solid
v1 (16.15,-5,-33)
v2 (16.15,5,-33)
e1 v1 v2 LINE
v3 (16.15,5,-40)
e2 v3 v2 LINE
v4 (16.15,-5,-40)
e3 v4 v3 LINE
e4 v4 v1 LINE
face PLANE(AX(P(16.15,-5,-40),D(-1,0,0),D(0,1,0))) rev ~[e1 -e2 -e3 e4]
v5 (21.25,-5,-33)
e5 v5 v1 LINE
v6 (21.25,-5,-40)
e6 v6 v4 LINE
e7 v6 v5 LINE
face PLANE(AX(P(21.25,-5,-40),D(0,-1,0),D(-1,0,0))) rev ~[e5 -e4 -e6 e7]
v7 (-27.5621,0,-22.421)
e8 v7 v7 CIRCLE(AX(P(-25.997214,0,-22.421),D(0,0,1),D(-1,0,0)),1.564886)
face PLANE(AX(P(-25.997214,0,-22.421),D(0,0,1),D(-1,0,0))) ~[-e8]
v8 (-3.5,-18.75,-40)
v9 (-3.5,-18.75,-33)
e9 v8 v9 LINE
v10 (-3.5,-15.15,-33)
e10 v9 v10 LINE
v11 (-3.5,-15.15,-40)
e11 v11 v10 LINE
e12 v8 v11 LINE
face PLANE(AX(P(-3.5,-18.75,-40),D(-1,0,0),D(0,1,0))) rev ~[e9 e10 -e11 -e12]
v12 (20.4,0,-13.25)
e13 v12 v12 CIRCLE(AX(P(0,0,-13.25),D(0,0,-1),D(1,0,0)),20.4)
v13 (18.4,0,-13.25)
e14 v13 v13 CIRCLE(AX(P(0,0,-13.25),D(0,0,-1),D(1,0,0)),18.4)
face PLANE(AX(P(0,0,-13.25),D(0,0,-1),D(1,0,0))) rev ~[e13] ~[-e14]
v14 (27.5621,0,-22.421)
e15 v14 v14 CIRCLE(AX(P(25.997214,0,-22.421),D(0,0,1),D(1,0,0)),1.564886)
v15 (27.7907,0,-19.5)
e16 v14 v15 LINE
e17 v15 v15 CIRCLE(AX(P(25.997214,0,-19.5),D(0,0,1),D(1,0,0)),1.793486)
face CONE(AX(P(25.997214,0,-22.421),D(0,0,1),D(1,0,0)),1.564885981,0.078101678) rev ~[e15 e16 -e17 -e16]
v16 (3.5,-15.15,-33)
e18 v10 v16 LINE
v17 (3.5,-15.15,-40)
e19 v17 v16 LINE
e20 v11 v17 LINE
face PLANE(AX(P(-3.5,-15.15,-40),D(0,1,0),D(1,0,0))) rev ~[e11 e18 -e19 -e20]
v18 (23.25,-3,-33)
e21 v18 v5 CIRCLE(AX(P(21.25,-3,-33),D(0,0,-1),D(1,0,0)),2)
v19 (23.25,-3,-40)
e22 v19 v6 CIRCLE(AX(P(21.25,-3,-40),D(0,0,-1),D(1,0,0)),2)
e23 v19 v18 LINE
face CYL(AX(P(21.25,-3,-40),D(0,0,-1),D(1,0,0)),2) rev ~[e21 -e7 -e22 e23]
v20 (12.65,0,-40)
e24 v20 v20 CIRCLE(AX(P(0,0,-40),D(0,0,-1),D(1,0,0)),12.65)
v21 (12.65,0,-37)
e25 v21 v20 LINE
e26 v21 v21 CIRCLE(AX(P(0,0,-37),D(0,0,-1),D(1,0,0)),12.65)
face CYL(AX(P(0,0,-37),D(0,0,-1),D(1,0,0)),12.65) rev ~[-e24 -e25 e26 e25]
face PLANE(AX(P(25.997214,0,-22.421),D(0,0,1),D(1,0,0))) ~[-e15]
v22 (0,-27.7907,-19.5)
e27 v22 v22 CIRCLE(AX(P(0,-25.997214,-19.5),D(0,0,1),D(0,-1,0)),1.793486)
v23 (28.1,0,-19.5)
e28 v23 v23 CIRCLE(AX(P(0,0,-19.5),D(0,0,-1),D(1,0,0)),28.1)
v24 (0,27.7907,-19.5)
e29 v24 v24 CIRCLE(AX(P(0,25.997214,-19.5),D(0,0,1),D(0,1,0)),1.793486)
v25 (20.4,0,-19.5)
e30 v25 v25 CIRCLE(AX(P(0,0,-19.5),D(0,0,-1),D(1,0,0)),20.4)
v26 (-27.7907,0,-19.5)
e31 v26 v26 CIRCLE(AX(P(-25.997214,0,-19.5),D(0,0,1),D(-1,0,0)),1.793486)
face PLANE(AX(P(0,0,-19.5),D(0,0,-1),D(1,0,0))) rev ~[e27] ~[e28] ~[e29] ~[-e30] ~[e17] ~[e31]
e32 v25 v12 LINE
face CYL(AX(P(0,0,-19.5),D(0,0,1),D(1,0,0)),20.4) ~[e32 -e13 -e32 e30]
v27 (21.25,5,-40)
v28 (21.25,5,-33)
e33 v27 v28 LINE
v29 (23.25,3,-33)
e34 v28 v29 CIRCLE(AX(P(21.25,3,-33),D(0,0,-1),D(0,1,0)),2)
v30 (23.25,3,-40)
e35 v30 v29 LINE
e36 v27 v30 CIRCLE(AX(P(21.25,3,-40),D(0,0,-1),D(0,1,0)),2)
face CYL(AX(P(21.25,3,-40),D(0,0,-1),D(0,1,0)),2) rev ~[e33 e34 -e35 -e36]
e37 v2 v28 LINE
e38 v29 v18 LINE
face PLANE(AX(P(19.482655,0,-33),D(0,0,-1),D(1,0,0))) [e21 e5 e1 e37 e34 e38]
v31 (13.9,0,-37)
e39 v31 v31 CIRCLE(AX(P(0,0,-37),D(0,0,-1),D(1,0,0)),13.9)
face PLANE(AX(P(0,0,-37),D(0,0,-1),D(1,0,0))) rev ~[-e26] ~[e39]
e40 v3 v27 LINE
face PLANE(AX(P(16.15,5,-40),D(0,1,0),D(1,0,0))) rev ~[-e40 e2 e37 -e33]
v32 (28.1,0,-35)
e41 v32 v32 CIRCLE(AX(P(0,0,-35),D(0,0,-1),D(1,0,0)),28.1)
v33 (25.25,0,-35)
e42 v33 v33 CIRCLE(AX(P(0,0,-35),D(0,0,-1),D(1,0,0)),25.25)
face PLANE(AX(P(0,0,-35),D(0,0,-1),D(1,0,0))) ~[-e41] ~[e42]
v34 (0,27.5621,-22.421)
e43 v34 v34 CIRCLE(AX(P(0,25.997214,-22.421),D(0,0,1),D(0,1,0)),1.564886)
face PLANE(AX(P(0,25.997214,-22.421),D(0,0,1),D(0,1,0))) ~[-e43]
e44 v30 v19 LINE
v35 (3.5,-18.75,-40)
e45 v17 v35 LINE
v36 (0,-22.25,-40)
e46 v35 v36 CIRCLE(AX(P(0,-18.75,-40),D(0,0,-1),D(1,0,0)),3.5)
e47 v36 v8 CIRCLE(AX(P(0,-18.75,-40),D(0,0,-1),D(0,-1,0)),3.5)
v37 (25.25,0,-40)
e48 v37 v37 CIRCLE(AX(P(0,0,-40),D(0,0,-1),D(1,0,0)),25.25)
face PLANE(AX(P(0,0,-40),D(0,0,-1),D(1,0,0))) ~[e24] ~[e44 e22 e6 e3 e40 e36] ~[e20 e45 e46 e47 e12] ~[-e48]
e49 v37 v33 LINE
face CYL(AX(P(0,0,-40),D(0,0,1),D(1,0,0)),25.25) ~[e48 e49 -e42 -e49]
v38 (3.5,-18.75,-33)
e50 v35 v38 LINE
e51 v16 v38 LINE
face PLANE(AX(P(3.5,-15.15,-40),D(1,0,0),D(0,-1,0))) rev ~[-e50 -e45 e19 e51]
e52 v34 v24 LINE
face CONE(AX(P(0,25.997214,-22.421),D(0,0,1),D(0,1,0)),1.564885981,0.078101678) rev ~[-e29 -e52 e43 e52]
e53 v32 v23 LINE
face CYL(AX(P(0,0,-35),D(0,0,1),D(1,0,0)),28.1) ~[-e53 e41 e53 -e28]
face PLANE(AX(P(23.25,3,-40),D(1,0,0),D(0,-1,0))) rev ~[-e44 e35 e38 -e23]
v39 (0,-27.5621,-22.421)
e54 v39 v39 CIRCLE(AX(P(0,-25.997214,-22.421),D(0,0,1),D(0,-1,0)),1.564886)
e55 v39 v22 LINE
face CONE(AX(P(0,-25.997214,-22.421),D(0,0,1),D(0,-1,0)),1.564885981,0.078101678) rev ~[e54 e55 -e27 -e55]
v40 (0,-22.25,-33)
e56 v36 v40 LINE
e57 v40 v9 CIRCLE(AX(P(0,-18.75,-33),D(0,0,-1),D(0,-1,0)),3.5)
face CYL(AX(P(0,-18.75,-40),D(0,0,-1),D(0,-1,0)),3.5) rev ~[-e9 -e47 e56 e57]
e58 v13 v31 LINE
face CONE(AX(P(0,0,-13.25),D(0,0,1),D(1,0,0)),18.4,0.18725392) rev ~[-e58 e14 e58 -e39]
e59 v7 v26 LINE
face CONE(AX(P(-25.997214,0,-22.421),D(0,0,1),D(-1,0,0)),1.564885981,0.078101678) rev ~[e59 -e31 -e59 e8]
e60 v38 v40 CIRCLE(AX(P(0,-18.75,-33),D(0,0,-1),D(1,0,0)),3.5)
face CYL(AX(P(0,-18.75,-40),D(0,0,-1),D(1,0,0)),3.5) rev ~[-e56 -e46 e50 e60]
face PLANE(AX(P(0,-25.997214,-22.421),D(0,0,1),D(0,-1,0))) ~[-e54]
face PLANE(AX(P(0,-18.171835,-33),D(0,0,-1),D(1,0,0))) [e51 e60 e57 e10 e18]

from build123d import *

# Parameters (mm, degrees)
F4_COPIES_COUNT = 4
F6_DEPTH        = 7


# Not quite as in the source:
# - a pattern or mirror of a feature is missing from the dataset's text; its kind, count and spacing are read off the source's solid


with BuildPart() as f1:
    # F0 (on Front) → F1 (revolve)
    with BuildSketch(Plane.XZ):
        Polygon((12.65, -40), (25.25, -40), (25.25, -35), (28.1, -35), (28.1, -19.5), (20.4, -19.5), (20.4, -13.25), (18.4, -13.25), (13.9, -37), (12.65, -37), align=None)
    revolve(axis=Axis((0, 0, -3.8875962891), (0, 0, -1)))

    # F3 (on Front) → F4 (revolve, cut)
    with BuildSketch(Plane.XZ):
        Polygon((27.7907, -19.5), (25.9972140193, -19.5), (25.9972140193, -22.421), (27.5621, -22.421), align=None)
    f4 = revolve(axis=Axis((25.9972140193, 0, -20.9605), (0, 0, 1)), mode=Mode.SUBTRACT)

    # F4_copies: F4 ×4 about axis
    f4_copies_axis = Axis((0, 0, 0), (0, 0, 1))
    for i in range(1, F4_COPIES_COUNT):
        add(f4.rotate(f4_copies_axis, i * 360 / F4_COPIES_COUNT), mode=Mode.SUBTRACT)

    # F5 (on face) → F6 (cut)
    with BuildSketch(Plane(origin=(0, 0, -40), x_dir=(1, 0, 0), z_dir=(0, 0, -1))):
        with BuildLine():
            Line((-3.5, 18.75), (-3.5, 15.15))
            Line((-3.5, 15.15), (3.5, 15.15))
            Line((3.5, 15.15), (3.5, 18.75))
            ThreePointArc((3.5, 18.75), (2.4748737342, 21.2248737342), (0, 22.25))
            ThreePointArc((0, 22.25), (-2.4748737342, 21.2248737342), (-3.5, 18.75))
        make_face()
        with BuildLine():
            ThreePointArc((23.25, 3), (22.6642135624, 4.4142135624), (21.25, 5))
            Line((21.25, 5), (16.15, 5))
            Line((16.15, 5), (16.15, -5))
            Line((16.15, -5), (21.25, -5))
            ThreePointArc((21.25, -5), (22.6642135624, -4.4142135624), (23.25, -3))
            Line((23.25, -3), (23.25, 3))
        make_face()
    extrude(amount=-F6_DEPTH, mode=Mode.SUBTRACT)


solid = f1.part
